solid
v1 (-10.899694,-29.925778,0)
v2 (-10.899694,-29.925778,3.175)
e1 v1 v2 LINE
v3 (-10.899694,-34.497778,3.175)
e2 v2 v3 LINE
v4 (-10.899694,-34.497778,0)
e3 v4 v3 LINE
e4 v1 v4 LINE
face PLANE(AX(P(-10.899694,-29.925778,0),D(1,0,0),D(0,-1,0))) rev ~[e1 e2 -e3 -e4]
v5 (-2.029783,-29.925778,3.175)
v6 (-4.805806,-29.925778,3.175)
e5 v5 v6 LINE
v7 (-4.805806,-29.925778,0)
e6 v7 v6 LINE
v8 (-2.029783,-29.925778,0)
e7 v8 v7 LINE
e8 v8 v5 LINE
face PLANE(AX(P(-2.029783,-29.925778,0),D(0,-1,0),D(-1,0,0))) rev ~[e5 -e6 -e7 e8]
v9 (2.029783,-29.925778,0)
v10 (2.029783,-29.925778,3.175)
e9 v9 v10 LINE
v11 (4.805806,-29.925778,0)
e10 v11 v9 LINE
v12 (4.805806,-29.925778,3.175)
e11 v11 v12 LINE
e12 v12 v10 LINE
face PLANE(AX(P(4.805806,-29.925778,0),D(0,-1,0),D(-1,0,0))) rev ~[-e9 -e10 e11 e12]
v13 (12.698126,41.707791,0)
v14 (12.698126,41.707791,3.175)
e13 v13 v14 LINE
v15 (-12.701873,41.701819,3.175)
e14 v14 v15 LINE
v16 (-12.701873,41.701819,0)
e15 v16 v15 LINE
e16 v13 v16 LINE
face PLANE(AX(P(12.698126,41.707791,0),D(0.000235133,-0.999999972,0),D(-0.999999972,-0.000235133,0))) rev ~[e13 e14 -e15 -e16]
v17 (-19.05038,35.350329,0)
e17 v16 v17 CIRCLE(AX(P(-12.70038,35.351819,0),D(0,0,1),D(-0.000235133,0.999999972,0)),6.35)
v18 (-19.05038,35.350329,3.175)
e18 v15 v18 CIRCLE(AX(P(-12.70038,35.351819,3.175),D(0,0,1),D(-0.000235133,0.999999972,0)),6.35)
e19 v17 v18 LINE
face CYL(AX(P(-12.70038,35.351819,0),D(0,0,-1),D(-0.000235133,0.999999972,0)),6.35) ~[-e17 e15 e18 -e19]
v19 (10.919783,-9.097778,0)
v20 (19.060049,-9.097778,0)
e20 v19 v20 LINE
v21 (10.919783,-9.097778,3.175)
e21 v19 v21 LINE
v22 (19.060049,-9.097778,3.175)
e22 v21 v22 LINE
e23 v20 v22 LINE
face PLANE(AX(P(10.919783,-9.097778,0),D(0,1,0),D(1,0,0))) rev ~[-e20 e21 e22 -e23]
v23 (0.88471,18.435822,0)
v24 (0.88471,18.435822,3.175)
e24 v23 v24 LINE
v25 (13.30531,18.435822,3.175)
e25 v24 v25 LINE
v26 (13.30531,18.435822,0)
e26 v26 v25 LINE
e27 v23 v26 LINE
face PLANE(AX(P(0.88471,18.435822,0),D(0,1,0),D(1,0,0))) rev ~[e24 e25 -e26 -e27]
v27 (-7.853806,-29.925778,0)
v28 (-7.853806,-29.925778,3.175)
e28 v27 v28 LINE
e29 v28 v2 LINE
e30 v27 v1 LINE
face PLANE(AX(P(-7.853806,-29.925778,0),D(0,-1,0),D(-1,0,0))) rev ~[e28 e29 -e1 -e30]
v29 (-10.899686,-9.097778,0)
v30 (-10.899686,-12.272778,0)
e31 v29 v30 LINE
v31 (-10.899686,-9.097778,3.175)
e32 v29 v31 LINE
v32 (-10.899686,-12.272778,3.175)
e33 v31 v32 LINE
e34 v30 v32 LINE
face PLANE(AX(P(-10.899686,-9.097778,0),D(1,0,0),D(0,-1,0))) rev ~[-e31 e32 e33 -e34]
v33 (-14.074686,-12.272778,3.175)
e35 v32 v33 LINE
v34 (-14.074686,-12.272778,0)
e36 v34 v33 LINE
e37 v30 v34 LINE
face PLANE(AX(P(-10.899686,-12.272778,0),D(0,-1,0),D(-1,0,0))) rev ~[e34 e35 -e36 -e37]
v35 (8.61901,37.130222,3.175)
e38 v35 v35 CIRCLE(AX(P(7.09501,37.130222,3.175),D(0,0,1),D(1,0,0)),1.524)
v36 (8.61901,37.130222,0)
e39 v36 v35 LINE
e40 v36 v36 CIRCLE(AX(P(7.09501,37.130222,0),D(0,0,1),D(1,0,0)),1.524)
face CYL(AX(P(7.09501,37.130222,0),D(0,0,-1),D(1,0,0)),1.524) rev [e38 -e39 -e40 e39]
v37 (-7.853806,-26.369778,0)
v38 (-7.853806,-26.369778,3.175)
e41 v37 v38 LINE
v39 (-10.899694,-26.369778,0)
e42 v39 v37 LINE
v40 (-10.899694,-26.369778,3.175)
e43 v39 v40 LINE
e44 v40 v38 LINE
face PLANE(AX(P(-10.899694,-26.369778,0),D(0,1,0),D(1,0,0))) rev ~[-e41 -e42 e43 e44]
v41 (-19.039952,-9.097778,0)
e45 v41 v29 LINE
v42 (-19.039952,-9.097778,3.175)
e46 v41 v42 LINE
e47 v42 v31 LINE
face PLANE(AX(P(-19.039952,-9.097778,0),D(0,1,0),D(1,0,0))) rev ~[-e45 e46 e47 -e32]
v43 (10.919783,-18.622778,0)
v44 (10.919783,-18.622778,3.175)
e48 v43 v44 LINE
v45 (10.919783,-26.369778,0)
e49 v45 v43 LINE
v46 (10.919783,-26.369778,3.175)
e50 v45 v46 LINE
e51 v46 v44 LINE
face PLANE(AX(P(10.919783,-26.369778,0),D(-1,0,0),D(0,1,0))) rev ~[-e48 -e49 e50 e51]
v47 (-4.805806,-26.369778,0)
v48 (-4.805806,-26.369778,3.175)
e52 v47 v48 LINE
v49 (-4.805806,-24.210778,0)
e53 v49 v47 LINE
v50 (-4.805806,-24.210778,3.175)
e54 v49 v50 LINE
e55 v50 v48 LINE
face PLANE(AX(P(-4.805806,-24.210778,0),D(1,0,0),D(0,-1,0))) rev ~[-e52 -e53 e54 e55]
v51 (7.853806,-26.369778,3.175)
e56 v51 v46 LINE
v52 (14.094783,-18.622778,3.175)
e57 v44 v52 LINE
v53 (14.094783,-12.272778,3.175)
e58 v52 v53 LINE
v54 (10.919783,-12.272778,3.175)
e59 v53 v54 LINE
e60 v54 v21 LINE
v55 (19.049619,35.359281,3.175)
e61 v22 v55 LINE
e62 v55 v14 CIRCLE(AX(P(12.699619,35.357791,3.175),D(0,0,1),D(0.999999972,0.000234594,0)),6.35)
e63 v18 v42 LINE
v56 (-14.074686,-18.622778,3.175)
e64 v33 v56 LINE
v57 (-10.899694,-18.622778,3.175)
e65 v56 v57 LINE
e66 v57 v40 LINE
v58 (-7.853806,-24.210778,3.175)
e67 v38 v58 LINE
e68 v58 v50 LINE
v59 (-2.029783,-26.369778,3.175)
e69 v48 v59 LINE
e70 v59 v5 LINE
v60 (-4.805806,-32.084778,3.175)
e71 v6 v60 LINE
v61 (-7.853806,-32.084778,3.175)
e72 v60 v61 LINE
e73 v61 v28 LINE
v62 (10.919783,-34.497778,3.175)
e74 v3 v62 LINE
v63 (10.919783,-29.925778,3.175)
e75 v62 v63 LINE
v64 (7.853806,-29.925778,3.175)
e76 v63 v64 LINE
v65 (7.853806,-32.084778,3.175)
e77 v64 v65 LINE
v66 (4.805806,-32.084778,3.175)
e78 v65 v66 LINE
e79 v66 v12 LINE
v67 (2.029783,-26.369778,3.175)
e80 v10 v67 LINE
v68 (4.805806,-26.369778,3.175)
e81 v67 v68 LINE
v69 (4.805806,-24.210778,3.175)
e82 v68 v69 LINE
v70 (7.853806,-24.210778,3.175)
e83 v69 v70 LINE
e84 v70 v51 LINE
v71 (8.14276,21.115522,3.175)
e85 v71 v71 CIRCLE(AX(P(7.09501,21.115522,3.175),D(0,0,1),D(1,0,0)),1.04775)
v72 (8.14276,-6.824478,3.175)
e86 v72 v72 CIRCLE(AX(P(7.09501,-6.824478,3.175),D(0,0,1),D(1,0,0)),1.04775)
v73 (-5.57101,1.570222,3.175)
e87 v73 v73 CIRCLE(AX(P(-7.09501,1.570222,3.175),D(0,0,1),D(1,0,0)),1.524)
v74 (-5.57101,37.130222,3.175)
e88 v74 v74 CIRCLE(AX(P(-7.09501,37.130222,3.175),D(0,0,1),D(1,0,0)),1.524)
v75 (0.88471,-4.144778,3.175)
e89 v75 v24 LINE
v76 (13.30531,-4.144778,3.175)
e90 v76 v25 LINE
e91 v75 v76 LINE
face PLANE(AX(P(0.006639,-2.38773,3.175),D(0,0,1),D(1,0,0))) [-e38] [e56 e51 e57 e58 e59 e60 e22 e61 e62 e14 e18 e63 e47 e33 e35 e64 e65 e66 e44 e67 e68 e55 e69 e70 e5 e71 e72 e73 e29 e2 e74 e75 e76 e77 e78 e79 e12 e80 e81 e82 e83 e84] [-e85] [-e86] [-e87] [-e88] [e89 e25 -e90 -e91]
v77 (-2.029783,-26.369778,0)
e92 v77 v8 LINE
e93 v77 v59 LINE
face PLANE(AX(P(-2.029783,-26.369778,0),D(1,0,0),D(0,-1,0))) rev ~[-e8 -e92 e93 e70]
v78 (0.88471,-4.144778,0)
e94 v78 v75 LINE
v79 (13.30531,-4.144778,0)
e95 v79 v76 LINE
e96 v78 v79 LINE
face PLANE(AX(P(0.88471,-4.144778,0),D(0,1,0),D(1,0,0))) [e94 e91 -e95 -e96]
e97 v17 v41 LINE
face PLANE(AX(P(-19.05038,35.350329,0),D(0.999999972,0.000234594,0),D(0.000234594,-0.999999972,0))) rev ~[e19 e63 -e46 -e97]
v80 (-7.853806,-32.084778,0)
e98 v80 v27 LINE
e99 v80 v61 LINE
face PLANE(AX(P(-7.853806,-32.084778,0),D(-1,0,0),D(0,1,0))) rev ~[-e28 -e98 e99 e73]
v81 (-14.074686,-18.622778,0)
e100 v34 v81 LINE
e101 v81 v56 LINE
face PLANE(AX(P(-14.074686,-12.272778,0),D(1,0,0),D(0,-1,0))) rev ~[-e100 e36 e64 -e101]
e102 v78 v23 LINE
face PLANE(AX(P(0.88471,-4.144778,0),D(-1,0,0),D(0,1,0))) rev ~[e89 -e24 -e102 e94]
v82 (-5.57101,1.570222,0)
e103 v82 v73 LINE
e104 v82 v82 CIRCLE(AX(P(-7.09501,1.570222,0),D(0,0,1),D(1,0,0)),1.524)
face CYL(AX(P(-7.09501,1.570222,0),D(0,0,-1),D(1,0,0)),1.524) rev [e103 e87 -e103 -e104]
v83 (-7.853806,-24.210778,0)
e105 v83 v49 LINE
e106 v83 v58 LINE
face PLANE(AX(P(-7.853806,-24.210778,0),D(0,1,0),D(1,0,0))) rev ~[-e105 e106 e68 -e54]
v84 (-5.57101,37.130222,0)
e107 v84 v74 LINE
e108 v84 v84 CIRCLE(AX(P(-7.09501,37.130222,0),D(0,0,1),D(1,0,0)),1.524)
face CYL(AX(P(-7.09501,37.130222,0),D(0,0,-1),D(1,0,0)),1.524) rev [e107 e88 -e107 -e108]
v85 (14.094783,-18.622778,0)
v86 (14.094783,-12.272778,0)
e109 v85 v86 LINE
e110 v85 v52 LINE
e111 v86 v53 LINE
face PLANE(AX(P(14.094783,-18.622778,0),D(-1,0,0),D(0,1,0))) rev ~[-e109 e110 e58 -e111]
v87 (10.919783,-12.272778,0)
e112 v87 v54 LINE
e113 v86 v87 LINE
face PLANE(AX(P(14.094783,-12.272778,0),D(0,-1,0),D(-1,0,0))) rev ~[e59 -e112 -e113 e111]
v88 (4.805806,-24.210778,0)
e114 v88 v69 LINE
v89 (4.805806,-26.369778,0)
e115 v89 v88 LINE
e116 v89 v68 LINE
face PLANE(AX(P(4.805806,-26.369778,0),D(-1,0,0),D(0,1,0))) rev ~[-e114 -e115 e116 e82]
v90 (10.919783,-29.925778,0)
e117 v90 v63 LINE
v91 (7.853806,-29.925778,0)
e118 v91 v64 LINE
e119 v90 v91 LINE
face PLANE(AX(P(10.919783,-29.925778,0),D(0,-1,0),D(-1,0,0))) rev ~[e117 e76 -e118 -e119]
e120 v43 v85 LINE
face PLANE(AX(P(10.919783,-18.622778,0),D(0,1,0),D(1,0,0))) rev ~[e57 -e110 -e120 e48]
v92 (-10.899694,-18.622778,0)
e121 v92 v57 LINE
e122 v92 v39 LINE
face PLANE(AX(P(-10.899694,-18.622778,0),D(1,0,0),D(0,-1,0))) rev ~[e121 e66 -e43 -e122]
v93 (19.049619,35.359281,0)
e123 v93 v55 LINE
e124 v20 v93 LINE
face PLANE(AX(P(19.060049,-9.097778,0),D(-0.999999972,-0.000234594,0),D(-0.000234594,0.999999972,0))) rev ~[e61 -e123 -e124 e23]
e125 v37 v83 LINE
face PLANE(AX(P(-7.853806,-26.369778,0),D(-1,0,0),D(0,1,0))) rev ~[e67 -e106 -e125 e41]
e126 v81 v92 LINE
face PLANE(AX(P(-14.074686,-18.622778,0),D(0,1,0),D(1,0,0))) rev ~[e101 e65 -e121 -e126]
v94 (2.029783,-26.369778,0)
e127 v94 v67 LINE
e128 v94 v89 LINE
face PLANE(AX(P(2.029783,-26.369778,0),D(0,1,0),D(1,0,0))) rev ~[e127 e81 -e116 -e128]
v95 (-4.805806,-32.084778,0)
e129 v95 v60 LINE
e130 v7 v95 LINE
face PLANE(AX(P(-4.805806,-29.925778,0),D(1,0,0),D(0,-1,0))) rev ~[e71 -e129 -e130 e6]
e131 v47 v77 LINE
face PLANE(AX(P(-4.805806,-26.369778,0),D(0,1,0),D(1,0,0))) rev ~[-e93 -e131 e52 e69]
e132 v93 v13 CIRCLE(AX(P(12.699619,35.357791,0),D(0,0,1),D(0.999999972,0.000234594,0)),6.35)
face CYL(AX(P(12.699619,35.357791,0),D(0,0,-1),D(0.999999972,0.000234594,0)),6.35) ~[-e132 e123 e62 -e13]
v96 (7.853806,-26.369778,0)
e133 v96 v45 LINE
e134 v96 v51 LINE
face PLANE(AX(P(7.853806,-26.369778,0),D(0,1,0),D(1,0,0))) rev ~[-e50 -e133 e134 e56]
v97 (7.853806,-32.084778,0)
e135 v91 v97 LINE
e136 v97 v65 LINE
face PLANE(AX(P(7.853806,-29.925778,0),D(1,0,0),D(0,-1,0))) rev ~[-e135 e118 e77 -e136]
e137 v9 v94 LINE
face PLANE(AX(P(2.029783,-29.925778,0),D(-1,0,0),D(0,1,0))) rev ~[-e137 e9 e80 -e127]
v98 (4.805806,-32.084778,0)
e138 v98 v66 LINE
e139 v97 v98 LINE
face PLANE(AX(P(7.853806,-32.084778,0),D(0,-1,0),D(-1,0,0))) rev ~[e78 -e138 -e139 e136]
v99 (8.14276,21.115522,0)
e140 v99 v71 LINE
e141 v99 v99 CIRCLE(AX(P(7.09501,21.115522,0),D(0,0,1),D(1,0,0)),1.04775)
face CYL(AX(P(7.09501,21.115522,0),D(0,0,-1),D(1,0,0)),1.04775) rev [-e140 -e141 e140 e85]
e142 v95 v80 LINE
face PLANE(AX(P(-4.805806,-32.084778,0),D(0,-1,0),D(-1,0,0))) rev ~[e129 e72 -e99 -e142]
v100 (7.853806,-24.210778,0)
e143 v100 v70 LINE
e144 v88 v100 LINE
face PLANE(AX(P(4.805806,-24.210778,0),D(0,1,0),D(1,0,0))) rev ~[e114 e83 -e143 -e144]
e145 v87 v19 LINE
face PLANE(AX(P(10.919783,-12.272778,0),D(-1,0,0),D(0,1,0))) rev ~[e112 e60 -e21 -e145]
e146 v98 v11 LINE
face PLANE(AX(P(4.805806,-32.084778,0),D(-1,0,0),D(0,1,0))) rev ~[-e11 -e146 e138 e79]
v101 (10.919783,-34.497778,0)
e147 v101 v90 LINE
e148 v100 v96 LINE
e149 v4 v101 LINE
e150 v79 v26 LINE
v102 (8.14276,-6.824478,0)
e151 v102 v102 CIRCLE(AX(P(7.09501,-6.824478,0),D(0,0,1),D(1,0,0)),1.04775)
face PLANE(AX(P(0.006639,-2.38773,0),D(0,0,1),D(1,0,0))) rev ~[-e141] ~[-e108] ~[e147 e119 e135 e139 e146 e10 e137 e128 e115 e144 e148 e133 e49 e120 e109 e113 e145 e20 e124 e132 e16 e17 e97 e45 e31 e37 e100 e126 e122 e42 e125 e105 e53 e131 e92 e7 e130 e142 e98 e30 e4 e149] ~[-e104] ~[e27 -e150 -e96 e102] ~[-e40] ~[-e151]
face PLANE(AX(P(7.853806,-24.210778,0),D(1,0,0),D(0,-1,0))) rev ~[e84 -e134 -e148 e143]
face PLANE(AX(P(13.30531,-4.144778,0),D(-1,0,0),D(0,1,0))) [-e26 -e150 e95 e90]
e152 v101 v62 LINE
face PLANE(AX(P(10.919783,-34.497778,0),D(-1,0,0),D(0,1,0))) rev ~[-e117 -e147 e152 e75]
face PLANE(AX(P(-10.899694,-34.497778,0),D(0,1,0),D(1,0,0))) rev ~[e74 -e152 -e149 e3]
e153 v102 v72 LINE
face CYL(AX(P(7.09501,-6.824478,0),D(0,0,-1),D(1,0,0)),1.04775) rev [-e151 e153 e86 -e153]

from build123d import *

# Parameters (mm, degrees)
F0_R     = 1.524
F0_R_2   = 1.04775
F0_W     = 12.4206
F0_H     = 22.5806
F1_DEPTH = 3.175


# Not quite as in the source:
# - ends of sketch curves that miss each other by under 0.0002 mm in the source are joined
# - a length typed as a fraction of an inch, garbled in the dataset ("3 / 203.2 mm" for 3/8 in), is restored


with BuildPart() as f1:
    # F0 (on Top) → F1 (new body)
    with BuildSketch(Plane.XY):
        with BuildLine():
            ThreePointArc((19.0496193061, 35.359281088), (17.1886928512, 39.8489739211), (12.6981263868, 41.7077912426))
            Line((12.6981263868, 41.7077912426), (-12.7018729111, 41.7018188664))
            ThreePointArc((-12.7018729111, 41.7018188664), (-17.19156232, 39.8408924124), (-19.0503796423, 35.3503293721))
            Line((-19.0503796423, 35.3503293721), (-19.0399523971, -9.0977780687))
            Line((-19.0399523971, -9.0977780687), (-10.8996863639, -9.0977780687))
            Line((-10.8996863639, -9.0977780687), (-10.8996863639, -12.2727780687))
            Line((-10.8996863639, -12.2727780687), (-14.0746863639, -12.2727780687))
            Line((-14.0746863639, -12.2727780687), (-14.0746863639, -18.6227780687))
            Line((-14.0746863639, -18.6227780687), (-10.8996939729, -18.6227780687))
            Line((-10.8996939729, -18.6227780687), (-10.8996939729, -26.3697780687))
            Line((-10.8996939729, -26.3697780687), (-7.8538059598, -26.3697780687))
            Line((-7.8538059598, -26.3697780687), (-7.8538059598, -24.2107780687))
            Line((-7.8538059598, -24.2107780687), (-4.8058059598, -24.2107780687))
            Line((-4.8058059598, -24.2107780687), (-4.8058059598, -26.3697780687))
            Line((-4.8058059598, -26.3697780687), (-2.0297826182, -26.3697780687))
            Line((-2.0297826182, -26.3697780687), (-2.0297826182, -29.9257780687))
            Line((-2.0297826182, -29.9257780687), (-4.8058059598, -29.9257780687))
            Line((-4.8058059598, -29.9257780687), (-4.8058059598, -32.0847780687))
            Line((-4.8058059598, -32.0847780687), (-7.8538059598, -32.0847780687))
            Line((-7.8538059598, -32.0847780687), (-7.8538059598, -29.9257780687))
            Line((-7.8538059598, -29.9257780687), (-10.8996939729, -29.9257780687))
            Line((-10.8996939729, -29.9257780687), (-10.8996939729, -34.4977780687))
            Line((-10.8996939729, -34.4977780687), (10.9197826182, -34.4977780687))
            Line((10.9197826182, -34.4977780687), (10.9197826182, -29.9257780687))
            Line((10.9197826182, -29.9257780687), (7.8538059598, -29.9257780687))
            Line((7.8538059598, -29.9257780687), (7.8538059598, -32.0847780687))
            Line((7.8538059598, -32.0847780687), (4.8058059598, -32.0847780687))
            Line((4.8058059598, -32.0847780687), (4.8058059598, -29.9257780687))
            Line((4.8058059598, -29.9257780687), (2.0297826182, -29.9257780687))
            Line((2.0297826182, -29.9257780687), (2.0297826182, -26.3697780687))
            Line((2.0297826182, -26.3697780687), (4.8058059598, -26.3697780687))
            Line((4.8058059598, -26.3697780687), (4.8058059598, -24.2107780687))
            Line((4.8058059598, -24.2107780687), (7.8538059598, -24.2107780687))
            Line((7.8538059598, -24.2107780687), (7.8538059598, -26.3697780687))
            Line((7.8538059598, -26.3697780687), (10.9197826182, -26.3697780687))
            Line((10.9197826182, -26.3697780687), (10.9197826182, -18.6227780687))
            Line((10.9197826182, -18.6227780687), (14.0947826182, -18.6227780687))
            Line((14.0947826182, -18.6227780687), (14.0947826182, -12.2727780687))
            Line((14.0947826182, -12.2727780687), (10.9197826182, -12.2727780687))
            Line((10.9197826182, -12.2727780687), (10.9197826182, -9.0977780687))
            Line((10.9197826182, -9.0977780687), (19.0600486513, -9.0977780687))
            Line((19.0600486513, -9.0977780687), (19.0496193061, 35.359281088))
        make_face()
        with Locations((-7.0950099938, 1.5702219313)):
            Circle(F0_R, mode=Mode.SUBTRACT)
        with Locations((7.0950099938, -6.8244780687)):
            Circle(F0_R_2, mode=Mode.SUBTRACT)
        with Locations((-7.0950099938, 37.1302219313)):
            Circle(F0_R, mode=Mode.SUBTRACT)
        with Locations((7.0950099938, 7.1455219313)):
            Rectangle(F0_W, F0_H, mode=Mode.SUBTRACT)
        with Locations((7.0950099938, 21.1155219313)):
            Circle(F0_R_2, mode=Mode.SUBTRACT)
        with Locations((7.0950099938, 37.1302219313)):
            Circle(F0_R, mode=Mode.SUBTRACT)
    extrude(amount=F1_DEPTH)


solid = f1.part
